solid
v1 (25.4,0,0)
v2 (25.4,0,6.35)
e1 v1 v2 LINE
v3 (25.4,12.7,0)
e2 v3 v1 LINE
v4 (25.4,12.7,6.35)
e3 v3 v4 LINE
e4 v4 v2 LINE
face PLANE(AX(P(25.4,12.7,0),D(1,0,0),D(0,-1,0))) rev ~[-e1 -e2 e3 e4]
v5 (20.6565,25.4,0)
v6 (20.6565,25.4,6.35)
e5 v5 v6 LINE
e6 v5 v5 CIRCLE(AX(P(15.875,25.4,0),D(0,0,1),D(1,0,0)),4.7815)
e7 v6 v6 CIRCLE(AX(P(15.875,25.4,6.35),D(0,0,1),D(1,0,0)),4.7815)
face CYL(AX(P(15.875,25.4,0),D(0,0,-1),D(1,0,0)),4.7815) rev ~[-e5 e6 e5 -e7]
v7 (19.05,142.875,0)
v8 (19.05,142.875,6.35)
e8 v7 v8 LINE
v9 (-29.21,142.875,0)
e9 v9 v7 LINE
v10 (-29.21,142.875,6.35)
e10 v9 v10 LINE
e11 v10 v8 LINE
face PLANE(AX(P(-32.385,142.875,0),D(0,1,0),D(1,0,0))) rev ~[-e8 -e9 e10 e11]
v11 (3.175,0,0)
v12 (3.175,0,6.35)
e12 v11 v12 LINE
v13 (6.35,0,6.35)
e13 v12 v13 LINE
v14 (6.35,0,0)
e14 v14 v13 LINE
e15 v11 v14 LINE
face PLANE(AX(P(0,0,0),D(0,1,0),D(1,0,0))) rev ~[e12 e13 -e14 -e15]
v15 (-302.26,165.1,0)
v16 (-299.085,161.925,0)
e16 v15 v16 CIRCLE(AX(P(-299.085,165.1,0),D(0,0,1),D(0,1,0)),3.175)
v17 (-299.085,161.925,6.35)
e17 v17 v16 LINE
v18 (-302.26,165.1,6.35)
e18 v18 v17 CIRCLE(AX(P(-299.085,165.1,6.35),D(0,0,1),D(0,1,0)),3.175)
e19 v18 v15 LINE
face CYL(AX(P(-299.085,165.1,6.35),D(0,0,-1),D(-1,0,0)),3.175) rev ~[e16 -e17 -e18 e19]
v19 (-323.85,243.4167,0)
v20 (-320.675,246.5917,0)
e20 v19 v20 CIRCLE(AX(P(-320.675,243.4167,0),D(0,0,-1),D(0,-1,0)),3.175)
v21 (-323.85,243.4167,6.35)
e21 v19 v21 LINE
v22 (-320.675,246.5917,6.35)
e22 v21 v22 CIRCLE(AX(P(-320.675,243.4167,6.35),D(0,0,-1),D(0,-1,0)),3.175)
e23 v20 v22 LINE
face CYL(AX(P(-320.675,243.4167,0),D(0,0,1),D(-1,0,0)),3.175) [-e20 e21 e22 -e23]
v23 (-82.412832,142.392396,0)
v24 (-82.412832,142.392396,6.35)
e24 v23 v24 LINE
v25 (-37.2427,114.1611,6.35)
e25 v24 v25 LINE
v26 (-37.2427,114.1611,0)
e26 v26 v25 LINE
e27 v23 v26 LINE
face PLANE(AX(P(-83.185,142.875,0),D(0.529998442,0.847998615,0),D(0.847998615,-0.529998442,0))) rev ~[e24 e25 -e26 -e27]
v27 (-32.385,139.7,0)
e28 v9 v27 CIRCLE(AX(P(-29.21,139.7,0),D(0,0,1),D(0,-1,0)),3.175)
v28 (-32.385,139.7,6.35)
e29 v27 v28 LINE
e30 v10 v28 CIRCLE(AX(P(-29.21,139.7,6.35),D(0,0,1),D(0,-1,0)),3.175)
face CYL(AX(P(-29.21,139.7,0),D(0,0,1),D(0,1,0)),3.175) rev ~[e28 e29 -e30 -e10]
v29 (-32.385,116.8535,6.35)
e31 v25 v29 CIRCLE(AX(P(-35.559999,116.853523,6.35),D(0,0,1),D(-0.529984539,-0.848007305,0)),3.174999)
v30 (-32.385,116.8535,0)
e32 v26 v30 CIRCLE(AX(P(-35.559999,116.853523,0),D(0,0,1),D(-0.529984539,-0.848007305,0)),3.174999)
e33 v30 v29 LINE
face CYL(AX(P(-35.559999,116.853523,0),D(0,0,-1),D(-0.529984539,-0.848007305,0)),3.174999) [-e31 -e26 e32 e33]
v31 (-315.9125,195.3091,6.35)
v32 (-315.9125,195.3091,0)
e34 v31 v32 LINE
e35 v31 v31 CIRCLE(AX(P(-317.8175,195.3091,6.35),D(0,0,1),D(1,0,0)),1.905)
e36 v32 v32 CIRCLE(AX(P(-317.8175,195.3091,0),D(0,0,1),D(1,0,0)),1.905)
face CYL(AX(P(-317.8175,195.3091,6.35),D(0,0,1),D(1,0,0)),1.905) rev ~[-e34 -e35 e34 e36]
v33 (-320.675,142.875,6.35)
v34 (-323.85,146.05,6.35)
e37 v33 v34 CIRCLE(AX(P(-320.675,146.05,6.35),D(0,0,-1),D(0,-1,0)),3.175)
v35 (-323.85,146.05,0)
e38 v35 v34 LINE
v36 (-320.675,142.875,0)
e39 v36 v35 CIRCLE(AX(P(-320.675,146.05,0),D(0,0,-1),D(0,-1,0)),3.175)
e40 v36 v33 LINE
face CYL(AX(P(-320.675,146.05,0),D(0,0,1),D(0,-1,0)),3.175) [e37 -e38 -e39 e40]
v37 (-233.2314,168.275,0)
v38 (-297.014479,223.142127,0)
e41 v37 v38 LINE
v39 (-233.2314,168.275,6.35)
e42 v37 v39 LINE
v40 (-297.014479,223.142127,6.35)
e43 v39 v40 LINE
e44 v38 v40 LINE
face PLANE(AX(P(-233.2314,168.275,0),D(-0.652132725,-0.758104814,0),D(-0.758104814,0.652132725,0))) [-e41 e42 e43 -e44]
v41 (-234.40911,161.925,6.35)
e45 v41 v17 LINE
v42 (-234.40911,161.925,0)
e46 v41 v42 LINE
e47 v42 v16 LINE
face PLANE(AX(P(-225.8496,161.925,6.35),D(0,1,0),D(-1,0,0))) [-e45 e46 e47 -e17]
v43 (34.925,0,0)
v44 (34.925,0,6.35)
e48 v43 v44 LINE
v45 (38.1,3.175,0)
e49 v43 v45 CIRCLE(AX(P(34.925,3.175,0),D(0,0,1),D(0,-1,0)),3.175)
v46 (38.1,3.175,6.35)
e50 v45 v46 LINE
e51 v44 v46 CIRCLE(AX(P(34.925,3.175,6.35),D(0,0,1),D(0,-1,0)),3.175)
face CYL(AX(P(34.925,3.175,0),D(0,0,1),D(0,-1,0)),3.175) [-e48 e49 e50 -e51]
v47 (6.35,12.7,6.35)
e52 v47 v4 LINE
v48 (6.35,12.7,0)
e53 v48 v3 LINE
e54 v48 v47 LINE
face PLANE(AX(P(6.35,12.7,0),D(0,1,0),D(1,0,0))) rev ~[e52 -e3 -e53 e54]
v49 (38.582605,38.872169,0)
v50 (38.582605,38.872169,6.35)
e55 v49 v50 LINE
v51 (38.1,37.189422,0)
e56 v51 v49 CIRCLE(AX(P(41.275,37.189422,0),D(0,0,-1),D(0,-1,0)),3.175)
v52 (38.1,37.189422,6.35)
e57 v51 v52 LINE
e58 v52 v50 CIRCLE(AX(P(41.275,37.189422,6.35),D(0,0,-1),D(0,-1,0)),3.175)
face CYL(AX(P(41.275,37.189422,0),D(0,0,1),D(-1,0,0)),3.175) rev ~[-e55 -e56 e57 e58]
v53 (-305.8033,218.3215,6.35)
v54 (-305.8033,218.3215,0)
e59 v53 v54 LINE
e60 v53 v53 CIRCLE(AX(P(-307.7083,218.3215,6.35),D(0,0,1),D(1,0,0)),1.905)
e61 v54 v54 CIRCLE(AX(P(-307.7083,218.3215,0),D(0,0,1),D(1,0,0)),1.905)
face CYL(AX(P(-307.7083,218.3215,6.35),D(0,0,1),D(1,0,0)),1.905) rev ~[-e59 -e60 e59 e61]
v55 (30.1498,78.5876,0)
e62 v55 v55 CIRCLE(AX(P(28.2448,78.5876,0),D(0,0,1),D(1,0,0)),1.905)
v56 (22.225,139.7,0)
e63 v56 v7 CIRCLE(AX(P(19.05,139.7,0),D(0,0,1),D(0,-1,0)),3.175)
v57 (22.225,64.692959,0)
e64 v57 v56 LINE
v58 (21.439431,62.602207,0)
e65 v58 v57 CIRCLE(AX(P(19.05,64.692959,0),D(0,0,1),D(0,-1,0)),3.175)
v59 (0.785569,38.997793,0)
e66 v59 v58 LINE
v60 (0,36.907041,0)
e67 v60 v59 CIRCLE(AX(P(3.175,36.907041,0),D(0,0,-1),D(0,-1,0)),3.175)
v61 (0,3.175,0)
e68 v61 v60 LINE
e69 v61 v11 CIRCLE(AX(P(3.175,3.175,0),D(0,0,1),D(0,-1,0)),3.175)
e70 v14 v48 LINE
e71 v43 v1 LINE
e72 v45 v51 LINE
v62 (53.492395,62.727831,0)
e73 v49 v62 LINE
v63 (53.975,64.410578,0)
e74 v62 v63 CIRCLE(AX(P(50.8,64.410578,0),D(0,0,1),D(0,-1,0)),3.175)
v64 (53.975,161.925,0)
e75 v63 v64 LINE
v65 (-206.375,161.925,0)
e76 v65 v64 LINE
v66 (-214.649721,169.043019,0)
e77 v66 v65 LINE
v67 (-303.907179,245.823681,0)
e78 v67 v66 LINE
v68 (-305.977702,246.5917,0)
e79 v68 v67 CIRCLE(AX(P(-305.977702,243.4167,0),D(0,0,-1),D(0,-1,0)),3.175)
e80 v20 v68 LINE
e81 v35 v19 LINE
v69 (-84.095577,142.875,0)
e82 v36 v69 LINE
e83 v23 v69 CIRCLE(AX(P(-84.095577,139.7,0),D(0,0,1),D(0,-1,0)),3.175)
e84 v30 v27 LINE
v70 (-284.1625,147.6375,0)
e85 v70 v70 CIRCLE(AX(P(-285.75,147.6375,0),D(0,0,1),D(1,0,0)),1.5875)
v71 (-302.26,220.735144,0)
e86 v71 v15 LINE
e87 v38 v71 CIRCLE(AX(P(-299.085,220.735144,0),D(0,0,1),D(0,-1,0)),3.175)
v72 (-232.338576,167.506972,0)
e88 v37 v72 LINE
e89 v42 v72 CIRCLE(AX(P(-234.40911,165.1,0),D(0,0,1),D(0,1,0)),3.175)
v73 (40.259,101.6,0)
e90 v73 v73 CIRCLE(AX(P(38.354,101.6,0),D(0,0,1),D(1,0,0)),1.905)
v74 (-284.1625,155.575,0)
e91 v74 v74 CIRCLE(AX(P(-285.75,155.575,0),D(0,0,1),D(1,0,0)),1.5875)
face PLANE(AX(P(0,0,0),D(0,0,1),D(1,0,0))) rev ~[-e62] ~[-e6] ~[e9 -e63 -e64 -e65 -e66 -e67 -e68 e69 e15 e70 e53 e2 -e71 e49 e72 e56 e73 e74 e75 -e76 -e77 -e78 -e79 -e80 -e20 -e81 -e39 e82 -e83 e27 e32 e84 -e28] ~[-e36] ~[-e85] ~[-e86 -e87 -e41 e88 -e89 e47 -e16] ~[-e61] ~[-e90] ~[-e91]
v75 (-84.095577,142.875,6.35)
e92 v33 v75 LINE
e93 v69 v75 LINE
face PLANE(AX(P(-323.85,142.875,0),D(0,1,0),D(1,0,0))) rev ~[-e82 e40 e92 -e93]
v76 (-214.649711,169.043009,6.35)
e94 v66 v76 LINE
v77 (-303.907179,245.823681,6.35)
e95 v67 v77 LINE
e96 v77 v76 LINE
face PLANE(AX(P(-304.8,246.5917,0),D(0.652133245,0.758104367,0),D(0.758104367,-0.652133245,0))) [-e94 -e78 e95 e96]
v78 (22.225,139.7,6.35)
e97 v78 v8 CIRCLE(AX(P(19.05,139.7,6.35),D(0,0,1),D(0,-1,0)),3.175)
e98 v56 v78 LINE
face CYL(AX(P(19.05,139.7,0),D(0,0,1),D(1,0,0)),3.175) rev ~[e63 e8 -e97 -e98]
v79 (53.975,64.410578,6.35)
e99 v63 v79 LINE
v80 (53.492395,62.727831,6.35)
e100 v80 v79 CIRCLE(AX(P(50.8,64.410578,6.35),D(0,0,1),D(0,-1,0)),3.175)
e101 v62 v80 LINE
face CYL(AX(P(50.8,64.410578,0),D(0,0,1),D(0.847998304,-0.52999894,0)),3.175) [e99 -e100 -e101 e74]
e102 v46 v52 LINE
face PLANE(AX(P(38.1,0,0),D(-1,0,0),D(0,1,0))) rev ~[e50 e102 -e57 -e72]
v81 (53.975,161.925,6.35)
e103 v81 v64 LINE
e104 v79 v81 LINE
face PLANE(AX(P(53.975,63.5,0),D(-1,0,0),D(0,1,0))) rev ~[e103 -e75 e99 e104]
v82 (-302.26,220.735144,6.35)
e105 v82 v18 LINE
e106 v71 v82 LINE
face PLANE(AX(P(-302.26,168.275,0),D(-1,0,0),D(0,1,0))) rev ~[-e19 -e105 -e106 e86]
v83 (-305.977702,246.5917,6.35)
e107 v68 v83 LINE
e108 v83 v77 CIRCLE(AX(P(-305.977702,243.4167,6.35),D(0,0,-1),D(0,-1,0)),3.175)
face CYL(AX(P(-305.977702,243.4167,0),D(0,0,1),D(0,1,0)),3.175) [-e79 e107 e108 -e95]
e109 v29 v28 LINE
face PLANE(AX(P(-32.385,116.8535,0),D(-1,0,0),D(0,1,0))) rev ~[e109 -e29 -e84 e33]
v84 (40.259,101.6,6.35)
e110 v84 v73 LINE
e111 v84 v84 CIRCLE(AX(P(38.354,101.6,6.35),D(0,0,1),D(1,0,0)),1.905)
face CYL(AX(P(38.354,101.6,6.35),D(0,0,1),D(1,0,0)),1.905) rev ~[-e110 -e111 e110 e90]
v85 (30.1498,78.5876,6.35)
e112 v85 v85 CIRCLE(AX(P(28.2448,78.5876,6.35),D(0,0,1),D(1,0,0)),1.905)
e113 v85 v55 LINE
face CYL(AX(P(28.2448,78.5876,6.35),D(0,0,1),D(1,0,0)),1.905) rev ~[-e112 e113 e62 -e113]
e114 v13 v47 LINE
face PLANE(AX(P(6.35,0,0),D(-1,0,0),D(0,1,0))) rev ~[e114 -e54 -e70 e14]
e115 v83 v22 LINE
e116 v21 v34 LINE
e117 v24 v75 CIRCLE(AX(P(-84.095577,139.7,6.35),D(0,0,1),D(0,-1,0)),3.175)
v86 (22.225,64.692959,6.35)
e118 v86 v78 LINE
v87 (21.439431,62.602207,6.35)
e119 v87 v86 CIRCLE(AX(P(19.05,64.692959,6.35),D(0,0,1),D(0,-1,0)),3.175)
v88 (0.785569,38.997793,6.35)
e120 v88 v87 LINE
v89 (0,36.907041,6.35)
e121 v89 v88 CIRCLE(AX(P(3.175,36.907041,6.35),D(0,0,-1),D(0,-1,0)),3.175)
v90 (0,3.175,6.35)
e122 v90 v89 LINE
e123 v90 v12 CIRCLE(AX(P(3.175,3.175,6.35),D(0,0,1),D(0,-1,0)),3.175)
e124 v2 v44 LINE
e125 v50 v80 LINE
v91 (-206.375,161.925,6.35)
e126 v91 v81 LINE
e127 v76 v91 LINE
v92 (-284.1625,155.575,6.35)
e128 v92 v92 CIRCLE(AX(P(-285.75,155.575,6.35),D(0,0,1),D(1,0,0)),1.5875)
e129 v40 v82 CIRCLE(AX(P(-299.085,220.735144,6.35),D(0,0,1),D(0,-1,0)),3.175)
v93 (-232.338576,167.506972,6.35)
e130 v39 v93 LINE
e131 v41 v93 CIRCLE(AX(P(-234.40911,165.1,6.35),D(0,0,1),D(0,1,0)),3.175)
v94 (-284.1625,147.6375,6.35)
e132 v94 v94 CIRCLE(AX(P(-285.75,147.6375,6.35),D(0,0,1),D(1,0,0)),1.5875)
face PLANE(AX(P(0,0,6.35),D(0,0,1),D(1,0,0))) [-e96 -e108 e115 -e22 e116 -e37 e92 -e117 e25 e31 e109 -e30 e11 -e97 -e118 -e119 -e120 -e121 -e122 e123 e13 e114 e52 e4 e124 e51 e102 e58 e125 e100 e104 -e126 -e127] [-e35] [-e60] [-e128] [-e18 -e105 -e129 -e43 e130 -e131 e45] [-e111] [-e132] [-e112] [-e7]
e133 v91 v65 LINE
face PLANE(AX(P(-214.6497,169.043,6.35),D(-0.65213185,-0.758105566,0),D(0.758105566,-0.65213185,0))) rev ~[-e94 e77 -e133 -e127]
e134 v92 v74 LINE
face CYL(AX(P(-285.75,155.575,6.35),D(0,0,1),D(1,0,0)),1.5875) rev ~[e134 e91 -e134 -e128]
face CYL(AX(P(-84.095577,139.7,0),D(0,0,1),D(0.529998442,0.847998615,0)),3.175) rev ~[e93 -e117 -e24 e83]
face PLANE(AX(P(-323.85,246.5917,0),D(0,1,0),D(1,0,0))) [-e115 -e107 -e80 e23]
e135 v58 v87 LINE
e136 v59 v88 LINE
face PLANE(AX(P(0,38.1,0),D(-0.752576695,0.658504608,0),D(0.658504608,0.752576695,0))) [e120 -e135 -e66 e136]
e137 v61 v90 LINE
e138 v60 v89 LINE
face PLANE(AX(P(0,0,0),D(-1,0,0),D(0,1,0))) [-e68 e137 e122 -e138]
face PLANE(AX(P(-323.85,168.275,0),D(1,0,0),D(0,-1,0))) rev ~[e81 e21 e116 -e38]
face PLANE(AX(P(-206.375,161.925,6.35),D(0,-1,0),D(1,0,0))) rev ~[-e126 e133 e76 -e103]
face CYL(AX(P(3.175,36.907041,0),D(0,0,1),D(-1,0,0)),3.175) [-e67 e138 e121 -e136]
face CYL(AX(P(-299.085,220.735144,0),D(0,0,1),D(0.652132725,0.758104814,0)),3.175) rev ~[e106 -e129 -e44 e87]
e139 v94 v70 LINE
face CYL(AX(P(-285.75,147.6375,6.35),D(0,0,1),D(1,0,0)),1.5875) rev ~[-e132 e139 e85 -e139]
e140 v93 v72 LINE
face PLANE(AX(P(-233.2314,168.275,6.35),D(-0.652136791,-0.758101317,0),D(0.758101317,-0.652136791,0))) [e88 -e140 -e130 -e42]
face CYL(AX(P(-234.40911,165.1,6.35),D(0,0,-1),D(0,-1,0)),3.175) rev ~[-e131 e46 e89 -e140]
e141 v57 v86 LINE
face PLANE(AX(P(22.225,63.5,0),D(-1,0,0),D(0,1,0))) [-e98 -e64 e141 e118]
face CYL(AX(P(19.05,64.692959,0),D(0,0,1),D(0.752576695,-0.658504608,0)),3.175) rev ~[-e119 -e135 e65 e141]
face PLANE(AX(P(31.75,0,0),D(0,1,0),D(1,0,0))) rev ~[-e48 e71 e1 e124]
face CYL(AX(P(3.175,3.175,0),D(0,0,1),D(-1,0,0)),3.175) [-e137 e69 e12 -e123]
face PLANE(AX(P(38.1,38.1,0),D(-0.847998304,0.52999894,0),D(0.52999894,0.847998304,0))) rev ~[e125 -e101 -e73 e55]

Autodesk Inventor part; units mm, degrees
ref_plane "YZ Plane" through (0, 0, 0) normal (1, 0, 0) x (0, 1, 0)
ref_plane "XZ Plane" through (0, 0, 0) normal (0, 1, 0) x (-1, 0, 0)
ref_plane "XY Plane" through (0, 0, 0) normal (0, 0, 1) x (1, 0, 0)
sketch "Sketch1" plane through (0, 0, 0) normal (0, 0, 1) x (1, 0, 0)
  line L0 (0, 0) -> (6.35, 0)
  line L1 (6.35, 0) -> (6.35, 12.7)
  line L2 (6.35, 12.7) -> (25.4, 12.7)
  line L3 (25.4, 12.7) -> (25.4, 0)
  line L4 (25.4, 0) -> (31.75, 0)
  circle A0 centre (15.875, 25.4) radius 4.7815
  line L5 (-323.85, 246.5917) -> (-305.435, 246.5917)
  line L6 (-323.85, 142.875) -> (-83.185, 142.875)
  line L7 (-83.185, 142.875) -> (-37.2427, 114.1611)
  line L8 (-32.385, 142.875) -> (22.225, 142.875)
  line L9 (-32.385, 116.8535) -> (-32.385, 142.875)
  arc A1 (-37.2427, 114.1611) -> (-32.385, 116.8535) centre (-35.56, 116.8535) ccw
  line L10 (-323.85, 168.275) -> (-323.85, 246.5917)
  line L11 (-323.85, 246.5917) -> (-304.8, 246.5917)
  line L12 (-323.85, 168.275) -> (-323.85, 142.875)
  line L13 (0, 0) -> (0, 38.1)
  line L14 (53.975, -21.4734) -> (53.975, 330.2514) construction
  line L15 (0, 38.1) -> (22.225, 63.5)
  line L16 (22.225, 63.5) -> (22.225, 142.875)
  line L17 (53.975, 63.5) -> (53.975, 168.275)
  line L18 (53.975, 63.5) -> (53.975, 168.275)
  line L19 (22.225, 63.5) -> (22.225, 142.875)
  line L20 (-32.385, 142.875) -> (22.225, 142.875)
  line L21 (-83.185, 142.875) -> (-323.85, 142.875)
  line L22 (31.75, 0) -> (38.1, 0)
  line L23 (38.1, 0) -> (38.1, 38.1)
  line L24 (38.1, 38.1) -> (53.975, 63.5)
  line L25 (38.1, 0) -> (31.75, 0)
  line L26 (-304.8, 246.5917) -> (-213.7569, 168.275)
  line L27 (-233.2314, 168.275) -> (-302.26, 227.6544)
  line L28 (53.975, 168.275) -> (-213.7569, 168.275)
  line L29 (-233.2314, 168.275) -> (-302.26, 168.275)
  line L30 (-302.26, 168.275) -> (-233.2314, 168.275)
  line L31 (-213.7569, 168.275) -> (53.975, 168.275)
  circle A2 centre (-285.75, 149.225) radius 1.5875
  circle A3 centre (-285.75, 161.925) radius 1.5875
  line L32 (-302.26, 168.275) -> (-302.26, 227.6544)
  point P0 (-32.385, 111.125)
  point P1 (-359.41, 168.275)
  dimension "d0" = 6.35
  dimension "d1" = 12.7
  dimension "d2" = 19.05
  dimension "d3" = 6.35
  dimension "d4" = 12.7
  dimension "d5" = 9.5631
  dimension "d6" = 12.7
  dimension "d8" = 377.825
  dimension "d17" = 103.7167
  dimension "d19" = 9.525
  dimension "d25" = 31.75
  dimension "d26" = 3.175
  dimension "d27" = 50.8
  dimension "d30" = 19.05
  dimension "d63" = 38.1
  dimension "d68" = 0
  dimension "d69" = 54.61
  dimension "d71" = 22.225
  dimension "d72" = 0
  dimension "d74" = 79.375
  dimension "d76" = 240.665
  dimension "d87" = 6.35
  dimension "d88" = 38.1
  dimension "d89" = 25.4
  dimension "d91" = 25.4
  dimension "d94" = 12.7
  dimension "d97" = 40.703
  dimension "d98" = 267.7319
  dimension "d109" = 3.175
  dimension "d110" = 3.175
  dimension "d111" = 38.1
  dimension "d112" = 38.1
  dimension "d113" = 6.35
  dimension "d114" = 6.35
  dimension "d135" = 25.4
  dimension "d136" = 25.4
  dimension "d143" = 21.59
ref_plane "Work Plane4" through (0, 0, 9.525) normal (0, 0, 1) x (1, 0, 0)
ref_plane "Work Plane3" through (0, 0, 9.525) normal (0, 0, 1) x (1, 0, 0)
extrude "Extrusion9" add sketch "Sketch1" along normal blind 6.35 contours L13 L15 L16 L8 L9 A1 L7 L6 L12 L10 L5 L11 L26 L28 L17 L24 L23 L22 L4 L3 L2 L1 L0 | A2 | A3
sketch "Sketch8" plane through (0, 0, 6.35) normal (0, 0, 1) x (1, 0, 0)
  line L0 (-304.8, 246.5917) -> (-323.85, 246.5917) projected
  line L1 (-323.85, 246.5917) -> (-323.85, 142.875) projected
  circle A0 centre (-307.7083, 218.3215) radius 1.905
  circle A1 centre (-317.8175, 195.3091) radius 1.905
  dimension "d101" = 3.81
  dimension "d102" = 3.81
  dimension "d103" = 16.1417
  dimension "d104" = 28.2702
  dimension "d105" = 6.0325
  dimension "d106" = 51.2826
extrude "Extrusion10" cut sketch "Sketch8" against normal blind 6.35
sketch "Sketch9" plane through (0, 0, 6.35) normal (0, 0, 1) x (1, 0, 0)
  line L0 (-323.85, 246.5917) -> (-323.85, 142.875) projected
  line L1 (-323.85, 142.875) -> (-83.185, 142.875) projected
  circle A0 centre (-285.75, 155.575) radius 1.5875
  circle A1 centre (-285.75, 147.6375) radius 1.5875
  dimension "d115" = 3.175
  dimension "d116" = 3.175
  dimension "d117" = 38.1
  dimension "d118" = 38.1
  dimension "d119" = 4.7625
  dimension "d124" = 7.9375
extrude "Extrusion11" cut sketch "Sketch9" against normal blind 6.35
fillet "Fillet8" radius 3.175 14 edges at (-304.8, 246.5917, 3.175) (-323.85, 246.5917, 3.175) (-213.7569, 168.275, 3.175) (53.975, 168.275, 3.175) (53.975, 63.5, 3.175) (38.1, 38.1, 3.175) (0, 0, 3.175) (0, 38.1, 3.175) (22.225, 142.875, 3.175) (22.225, 63.5, 3.175) (-83.185, 142.875, 3.175) (-32.385, 142.875, 3.175) (-323.85, 142.875, 3.175) (-302.26, 227.6544, 3.175)
fillet "Fillet9" radius 3.175 1 edges at (38.1, 0, 3.175)
sketch "Sketch10" plane through (0, 0, 6.35) normal (0, 0, 1) x (1, 0, 0)
  line L0 (-29.21, 142.875) -> (19.05, 142.875) projected
  line L1 (22.225, 139.7) -> (22.225, 64.693) projected
  line L2 (-304.8, 168.275) -> (-304.8, 222.9201) projected
  line L3 (96.2124, 104.775) -> (-86.2445, 104.775) construction
  circle A0 centre (38.354, 101.6) radius 1.905
  circle A1 centre (28.2448, 78.5876) radius 1.905
  point P0 (0, 0)
  dimension "d126" = 38.1
  dimension "d127" = 3.81
  dimension "d128" = 3.81
  dimension "d129" = 10.1092
  dimension "d130" = 23.0124
  dimension "d131" = 6.0198
  dimension "d132" = 3.175
extrude "Extrusion12" cut sketch "Sketch10" against normal blind 6.35
sketch "Sketch11" plane through (0, 0, 6.35) normal (0, 0, 1) x (1, 0, 0)
  line L0 (53.975, 64.4106) -> (53.975, 165.1) projected
  arc A0 (53.975, 165.1) -> (50.8, 168.275) centre (50.8, 165.1) ccw projected
  line L1 (50.8, 168.275) -> (-212.5792, 168.275) projected
  arc A1 (-214.6497, 169.043) -> (-212.5792, 168.275) centre (-212.5792, 171.45) ccw projected
  line L2 (-233.2314, 168.275) -> (-302.26, 168.275) projected
  line L3 (-297.0145, 223.1421) -> (-233.2314, 168.275) projected
  line L4 (-302.26, 161.925) -> (-233.2314, 161.925)
  line L5 (-233.2314, 168.275) -> (-225.8496, 161.925)
  line L6 (-225.8496, 161.925) -> (-233.2314, 161.925)
  line L7 (-214.6497, 169.043) -> (-206.375, 161.925)
  line L8 (-206.375, 161.925) -> (53.975, 161.925)
  line L9 (-302.26, 168.275) -> (-302.26, 161.925)
  point P0 (0, 0)
  dimension "d139" = 6.35
  dimension "d144" = 6.35
extrude "Extrusion13" cut sketch "Sketch11" against normal blind 25.4
fillet "Fillet11" radius 3.175 2 edges at (-302.26, 161.925, 3.175) (-225.8496, 161.925, 3.175)
properties part number "Left Climber Hook_v2"
